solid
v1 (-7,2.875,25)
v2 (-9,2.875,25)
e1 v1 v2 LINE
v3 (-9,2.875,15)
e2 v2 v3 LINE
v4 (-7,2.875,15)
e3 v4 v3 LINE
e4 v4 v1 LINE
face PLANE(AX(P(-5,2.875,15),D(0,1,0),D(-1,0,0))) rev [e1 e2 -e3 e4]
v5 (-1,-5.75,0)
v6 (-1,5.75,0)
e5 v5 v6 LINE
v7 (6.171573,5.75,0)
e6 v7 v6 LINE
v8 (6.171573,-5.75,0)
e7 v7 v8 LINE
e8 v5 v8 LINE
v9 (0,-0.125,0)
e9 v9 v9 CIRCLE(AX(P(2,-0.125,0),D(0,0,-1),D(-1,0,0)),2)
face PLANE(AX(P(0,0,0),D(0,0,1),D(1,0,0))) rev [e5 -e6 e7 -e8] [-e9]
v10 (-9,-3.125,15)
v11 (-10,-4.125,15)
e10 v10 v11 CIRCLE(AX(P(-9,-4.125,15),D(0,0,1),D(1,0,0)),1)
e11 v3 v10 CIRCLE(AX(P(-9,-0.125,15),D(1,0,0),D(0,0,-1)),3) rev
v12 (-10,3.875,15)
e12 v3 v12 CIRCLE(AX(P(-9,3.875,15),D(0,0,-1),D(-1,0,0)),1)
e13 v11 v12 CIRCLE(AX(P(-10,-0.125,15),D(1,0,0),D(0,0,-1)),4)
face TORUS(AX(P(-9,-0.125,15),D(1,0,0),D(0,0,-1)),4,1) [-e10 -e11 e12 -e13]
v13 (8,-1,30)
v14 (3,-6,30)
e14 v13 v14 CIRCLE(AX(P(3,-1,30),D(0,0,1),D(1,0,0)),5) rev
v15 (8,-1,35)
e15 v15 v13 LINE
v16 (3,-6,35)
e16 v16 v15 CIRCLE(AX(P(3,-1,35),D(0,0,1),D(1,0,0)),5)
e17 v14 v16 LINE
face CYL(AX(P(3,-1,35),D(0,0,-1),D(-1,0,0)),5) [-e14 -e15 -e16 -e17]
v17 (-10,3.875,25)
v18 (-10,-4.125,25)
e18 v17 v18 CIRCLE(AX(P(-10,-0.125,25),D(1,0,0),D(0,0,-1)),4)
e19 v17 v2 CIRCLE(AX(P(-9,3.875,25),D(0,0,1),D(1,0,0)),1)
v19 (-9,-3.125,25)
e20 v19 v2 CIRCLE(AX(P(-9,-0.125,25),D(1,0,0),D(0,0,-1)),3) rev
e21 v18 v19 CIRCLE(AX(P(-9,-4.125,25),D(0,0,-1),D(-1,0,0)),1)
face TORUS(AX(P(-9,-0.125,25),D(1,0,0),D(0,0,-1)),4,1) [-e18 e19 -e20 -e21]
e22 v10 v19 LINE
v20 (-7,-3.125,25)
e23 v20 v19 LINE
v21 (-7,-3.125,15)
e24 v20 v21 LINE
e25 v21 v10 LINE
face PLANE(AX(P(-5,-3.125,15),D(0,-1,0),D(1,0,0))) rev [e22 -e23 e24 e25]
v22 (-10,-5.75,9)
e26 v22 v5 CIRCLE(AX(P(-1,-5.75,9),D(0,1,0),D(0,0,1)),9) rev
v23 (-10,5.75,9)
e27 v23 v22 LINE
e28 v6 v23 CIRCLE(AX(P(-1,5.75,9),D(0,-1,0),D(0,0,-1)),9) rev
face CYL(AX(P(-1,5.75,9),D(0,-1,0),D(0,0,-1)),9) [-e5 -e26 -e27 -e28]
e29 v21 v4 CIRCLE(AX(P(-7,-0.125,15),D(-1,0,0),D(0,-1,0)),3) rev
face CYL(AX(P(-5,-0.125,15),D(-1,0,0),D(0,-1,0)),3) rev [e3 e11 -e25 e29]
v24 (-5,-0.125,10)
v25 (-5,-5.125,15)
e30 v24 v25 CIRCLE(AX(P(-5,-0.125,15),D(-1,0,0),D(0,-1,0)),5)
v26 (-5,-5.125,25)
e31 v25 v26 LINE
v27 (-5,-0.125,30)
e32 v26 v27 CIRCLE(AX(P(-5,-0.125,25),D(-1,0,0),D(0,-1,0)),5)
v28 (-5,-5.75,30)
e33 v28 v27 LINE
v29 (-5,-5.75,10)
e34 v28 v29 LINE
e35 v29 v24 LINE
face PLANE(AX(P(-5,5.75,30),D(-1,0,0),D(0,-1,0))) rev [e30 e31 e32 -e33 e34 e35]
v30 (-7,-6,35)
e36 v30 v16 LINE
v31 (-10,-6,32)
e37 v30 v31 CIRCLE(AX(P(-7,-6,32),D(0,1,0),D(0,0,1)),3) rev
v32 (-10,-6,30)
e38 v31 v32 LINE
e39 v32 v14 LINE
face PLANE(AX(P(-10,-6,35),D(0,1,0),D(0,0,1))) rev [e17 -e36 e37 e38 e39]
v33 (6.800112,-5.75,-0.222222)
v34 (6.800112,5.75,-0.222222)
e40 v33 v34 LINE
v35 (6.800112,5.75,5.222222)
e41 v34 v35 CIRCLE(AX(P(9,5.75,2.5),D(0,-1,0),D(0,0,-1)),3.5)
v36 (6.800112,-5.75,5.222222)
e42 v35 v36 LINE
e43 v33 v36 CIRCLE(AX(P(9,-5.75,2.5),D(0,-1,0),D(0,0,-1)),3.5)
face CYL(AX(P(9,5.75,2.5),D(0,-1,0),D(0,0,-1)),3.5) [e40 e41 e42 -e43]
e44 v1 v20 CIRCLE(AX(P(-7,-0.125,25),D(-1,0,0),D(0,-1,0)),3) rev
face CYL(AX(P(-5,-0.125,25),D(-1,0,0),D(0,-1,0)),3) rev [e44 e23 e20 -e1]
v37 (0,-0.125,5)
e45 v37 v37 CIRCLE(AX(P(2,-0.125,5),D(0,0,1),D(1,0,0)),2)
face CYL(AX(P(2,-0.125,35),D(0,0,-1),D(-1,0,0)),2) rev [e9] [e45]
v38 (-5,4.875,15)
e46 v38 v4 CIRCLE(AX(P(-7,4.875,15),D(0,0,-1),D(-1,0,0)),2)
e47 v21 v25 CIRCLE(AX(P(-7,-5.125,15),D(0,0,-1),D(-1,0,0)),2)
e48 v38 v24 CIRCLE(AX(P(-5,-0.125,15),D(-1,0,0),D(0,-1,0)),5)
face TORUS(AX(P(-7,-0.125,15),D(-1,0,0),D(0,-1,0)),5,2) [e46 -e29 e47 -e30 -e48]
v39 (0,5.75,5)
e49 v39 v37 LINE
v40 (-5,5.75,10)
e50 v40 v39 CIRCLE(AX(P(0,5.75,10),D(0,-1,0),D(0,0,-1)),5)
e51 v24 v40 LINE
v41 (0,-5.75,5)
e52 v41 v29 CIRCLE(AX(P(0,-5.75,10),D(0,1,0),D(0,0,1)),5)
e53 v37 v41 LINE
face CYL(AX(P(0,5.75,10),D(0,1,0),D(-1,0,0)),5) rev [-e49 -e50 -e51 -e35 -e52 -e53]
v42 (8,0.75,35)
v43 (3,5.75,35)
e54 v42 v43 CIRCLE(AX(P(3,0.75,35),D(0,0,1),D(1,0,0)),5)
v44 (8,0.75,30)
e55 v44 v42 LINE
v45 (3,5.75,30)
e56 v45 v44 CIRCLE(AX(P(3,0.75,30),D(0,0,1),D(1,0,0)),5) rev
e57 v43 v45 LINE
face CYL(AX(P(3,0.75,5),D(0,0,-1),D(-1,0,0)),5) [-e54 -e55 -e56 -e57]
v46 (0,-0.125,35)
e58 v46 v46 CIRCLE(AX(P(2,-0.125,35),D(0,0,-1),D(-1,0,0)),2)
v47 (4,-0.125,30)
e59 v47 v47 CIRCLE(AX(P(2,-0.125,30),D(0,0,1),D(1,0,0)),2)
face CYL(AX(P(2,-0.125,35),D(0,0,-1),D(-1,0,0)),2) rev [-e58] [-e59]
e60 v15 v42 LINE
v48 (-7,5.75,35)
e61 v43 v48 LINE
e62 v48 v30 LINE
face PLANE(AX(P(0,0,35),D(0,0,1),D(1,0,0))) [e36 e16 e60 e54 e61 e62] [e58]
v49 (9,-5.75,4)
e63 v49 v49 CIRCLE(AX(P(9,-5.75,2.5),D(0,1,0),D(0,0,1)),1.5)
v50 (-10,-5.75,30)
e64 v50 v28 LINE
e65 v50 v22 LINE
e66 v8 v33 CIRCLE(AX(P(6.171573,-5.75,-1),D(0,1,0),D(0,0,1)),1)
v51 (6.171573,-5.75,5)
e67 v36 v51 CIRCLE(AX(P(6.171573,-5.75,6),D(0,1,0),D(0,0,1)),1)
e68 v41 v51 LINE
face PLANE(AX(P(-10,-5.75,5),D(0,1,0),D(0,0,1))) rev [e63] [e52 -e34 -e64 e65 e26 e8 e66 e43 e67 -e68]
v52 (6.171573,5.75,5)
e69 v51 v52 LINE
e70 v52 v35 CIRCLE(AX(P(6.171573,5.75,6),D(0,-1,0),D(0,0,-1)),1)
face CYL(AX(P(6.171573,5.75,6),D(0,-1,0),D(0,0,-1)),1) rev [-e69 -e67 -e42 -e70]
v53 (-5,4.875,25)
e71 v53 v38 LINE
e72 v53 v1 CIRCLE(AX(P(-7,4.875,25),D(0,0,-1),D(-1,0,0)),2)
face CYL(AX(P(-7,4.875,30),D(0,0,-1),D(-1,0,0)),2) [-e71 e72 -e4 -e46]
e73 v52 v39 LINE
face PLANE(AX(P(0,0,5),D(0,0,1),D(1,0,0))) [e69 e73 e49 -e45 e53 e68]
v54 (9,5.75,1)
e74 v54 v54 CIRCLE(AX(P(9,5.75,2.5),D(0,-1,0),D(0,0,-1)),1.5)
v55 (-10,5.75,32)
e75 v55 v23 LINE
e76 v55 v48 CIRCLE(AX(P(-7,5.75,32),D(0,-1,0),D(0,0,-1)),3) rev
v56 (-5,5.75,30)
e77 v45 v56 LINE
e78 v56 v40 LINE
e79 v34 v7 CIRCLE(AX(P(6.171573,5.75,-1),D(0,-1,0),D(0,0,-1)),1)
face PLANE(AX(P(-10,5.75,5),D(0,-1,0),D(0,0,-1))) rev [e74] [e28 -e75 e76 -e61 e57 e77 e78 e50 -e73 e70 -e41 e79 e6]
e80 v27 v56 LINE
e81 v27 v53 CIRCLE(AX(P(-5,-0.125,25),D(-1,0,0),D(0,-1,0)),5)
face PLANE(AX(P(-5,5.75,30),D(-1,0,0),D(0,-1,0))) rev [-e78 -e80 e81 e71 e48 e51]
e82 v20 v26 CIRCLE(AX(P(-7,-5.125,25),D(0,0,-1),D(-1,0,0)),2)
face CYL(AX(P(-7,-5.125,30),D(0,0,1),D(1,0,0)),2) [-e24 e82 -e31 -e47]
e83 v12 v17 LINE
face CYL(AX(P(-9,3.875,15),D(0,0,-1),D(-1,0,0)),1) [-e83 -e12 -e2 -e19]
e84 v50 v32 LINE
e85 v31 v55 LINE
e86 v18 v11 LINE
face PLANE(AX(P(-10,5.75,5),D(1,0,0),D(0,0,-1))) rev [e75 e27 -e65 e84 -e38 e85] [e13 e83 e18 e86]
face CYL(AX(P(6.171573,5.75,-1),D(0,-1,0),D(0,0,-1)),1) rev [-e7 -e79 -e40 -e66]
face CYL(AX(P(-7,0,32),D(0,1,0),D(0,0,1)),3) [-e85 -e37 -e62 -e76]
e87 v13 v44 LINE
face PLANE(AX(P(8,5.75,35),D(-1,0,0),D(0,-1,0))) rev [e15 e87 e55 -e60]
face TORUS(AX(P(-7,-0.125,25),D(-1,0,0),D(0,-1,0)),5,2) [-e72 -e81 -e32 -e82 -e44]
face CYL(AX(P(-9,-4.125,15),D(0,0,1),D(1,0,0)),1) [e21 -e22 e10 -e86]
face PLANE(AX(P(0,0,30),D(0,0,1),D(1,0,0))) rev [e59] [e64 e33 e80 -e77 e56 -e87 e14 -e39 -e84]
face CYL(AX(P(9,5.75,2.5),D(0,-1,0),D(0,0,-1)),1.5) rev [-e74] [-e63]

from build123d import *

# Parameters (mm, degrees)
SKETCH1_W               = 20
SKETCH1_H               = 11.5
BOSS_EXTRUDE1_DEPTH     = 5
SKETCH2_W               = 5
SKETCH2_H               = 11.5
BOSS_EXTRUDE2_DEPTH     = 25
SKETCH3_W               = 18
SKETCH3_H               = 11.75
BOSS_EXTRUDE3_DEPTH     = 5
CUT_EXTRUDE1_DEPTH      = 5
CUT_EXTRUDE2_DEPTH      = 33.186953879
CUT_EXTRUDE2_DEPTH_BACK = 33.186953879
SKETCH5_R               = 2
FILLET1_R               = 9
FILLET7_R               = 5
FILLET8_R               = 1
FILLET9_R               = 2
CUT_EXTRUDE4_DEPTH      = 39.173943993
CUT_EXTRUDE4_DEPTH_BACK = 39.173943993
SKETCH10_R              = 1.5
SKETCH10_4_R            = 3.5
SKETCH10_4_R_2          = 1.5
BOSS_EXTRUDE7_DEPTH     = 11.5
FILLET13_R              = 1
FILLET16_R              = 5
FILLET17_R              = 3


with BuildPart() as part:
    # Sketch1 → Boss-Extrude1 (new body)
    with BuildSketch(Plane.XY):
        Rectangle(SKETCH1_W, SKETCH1_H)
    extrude(amount=BOSS_EXTRUDE1_DEPTH)

    # Sketch2 → Boss-Extrude2 (add)
    with BuildSketch(Plane.XY.offset(5)):
        with Locations((-7.5, 0)):
            Rectangle(SKETCH2_W, SKETCH2_H)
    extrude(amount=BOSS_EXTRUDE2_DEPTH)

    # Sketch3 → Boss-Extrude3 (add)
    with BuildSketch(Plane.XY.offset(30)):
        with Locations((-1, -0.125)):
            Rectangle(SKETCH3_W, SKETCH3_H)
    extrude(amount=BOSS_EXTRUDE3_DEPTH)

    # Sketch4 → Cut-Extrude1 (cut)
    with BuildSketch(Plane.ZY.offset(10)):
        with BuildLine():
            Line((15, 2.875), (25, 2.875))
            ThreePointArc((25, 2.875), (28, -0.125), (25, -3.125))
            Line((25, -3.125), (15, -3.125))
            ThreePointArc((15, -3.125), (12, -0.125), (15, 2.875))
        make_face()
    extrude(amount=-CUT_EXTRUDE1_DEPTH, mode=Mode.SUBTRACT)

    # Sketch5 → Cut-Extrude2 (cut, two sides: drawn at the far end of the back side and taken through both)
    with BuildSketch(Plane(origin=(0, 0, 30), x_dir=(-1, 0, 0), z_dir=(0, 0, -1)).offset(-CUT_EXTRUDE2_DEPTH_BACK)):
        with Locations((-2, -0.125)):
            Circle(SKETCH5_R)
    extrude(amount=CUT_EXTRUDE2_DEPTH + CUT_EXTRUDE2_DEPTH_BACK, mode=Mode.SUBTRACT)

    # Fillet1
    fillet1_edges = [part.edges().sort_by_distance(p)[0] for p in [
        (-10, 0, 0),
    ]]
    fillet(fillet1_edges, radius=FILLET1_R)

    # Fillet7
    fillet7_edges = [part.edges().sort_by_distance(p)[0] for p in [
        (8, -6, 32.5),
        (8, 5.75, 32.5),
    ]]
    fillet(fillet7_edges, radius=FILLET7_R)

    # Fillet8
    fillet8_edges = [part.edges().sort_by_distance(p)[0] for p in [
        (-10, -0.125, 12),
        (-10, -3.125, 20),
        (-10, -0.125, 28),
        (-10, 2.875, 20),
    ]]
    fillet(fillet8_edges, radius=FILLET8_R)

    # Fillet9
    fillet9_edges = [part.edges().sort_by_distance(p)[0] for p in [
        (-5, -0.125, 12),
        (-5, 2.875, 20),
        (-5, -0.125, 28),
        (-5, -3.125, 20),
    ]]
    fillet(fillet9_edges, radius=FILLET9_R - 0.0001)  # a hair under: the kernel refuses the full size

    # Sketch10 → Cut-Extrude4 (cut, two sides: drawn at the far end of the back side and taken through both)
    with BuildSketch(Plane.XZ.offset(5.75).offset(-CUT_EXTRUDE4_DEPTH_BACK)):
        with Locations((9, 2.5)):
            Circle(SKETCH10_R)
    extrude(amount=CUT_EXTRUDE4_DEPTH + CUT_EXTRUDE4_DEPTH_BACK, mode=Mode.SUBTRACT)

    # Sketch10<4> → Boss-Extrude7 (add)
    with BuildSketch(Plane.XZ.offset(5.75)):
        with Locations((9, 2.5)):
            Circle(SKETCH10_4_R)
        with Locations(Location((9, 2.5, 0), (0, 0, 270))):
            Circle(SKETCH10_4_R_2, mode=Mode.SUBTRACT)
    extrude(amount=-BOSS_EXTRUDE7_DEPTH)

    # Fillet13
    fillet13_edges = [part.edges().sort_by_distance(p)[0] for p in [
        (6.550510257, 0, 0),
        (6.550510257, 0, 5),
    ]]
    fillet(fillet13_edges, radius=FILLET13_R)

    # Fillet16
    fillet16_edges = [part.edges().sort_by_distance(p)[0] for p in [
        (-5, 0, 5),
    ]]
    fillet(fillet16_edges, radius=FILLET16_R - 0.0001)  # a hair under: the kernel refuses the full size

    # Fillet17
    fillet17_edges = [part.edges().sort_by_distance(p)[0] for p in [
        (-10, -0.125, 35),
    ]]
    fillet(fillet17_edges, radius=FILLET17_R)


solid = part.part
